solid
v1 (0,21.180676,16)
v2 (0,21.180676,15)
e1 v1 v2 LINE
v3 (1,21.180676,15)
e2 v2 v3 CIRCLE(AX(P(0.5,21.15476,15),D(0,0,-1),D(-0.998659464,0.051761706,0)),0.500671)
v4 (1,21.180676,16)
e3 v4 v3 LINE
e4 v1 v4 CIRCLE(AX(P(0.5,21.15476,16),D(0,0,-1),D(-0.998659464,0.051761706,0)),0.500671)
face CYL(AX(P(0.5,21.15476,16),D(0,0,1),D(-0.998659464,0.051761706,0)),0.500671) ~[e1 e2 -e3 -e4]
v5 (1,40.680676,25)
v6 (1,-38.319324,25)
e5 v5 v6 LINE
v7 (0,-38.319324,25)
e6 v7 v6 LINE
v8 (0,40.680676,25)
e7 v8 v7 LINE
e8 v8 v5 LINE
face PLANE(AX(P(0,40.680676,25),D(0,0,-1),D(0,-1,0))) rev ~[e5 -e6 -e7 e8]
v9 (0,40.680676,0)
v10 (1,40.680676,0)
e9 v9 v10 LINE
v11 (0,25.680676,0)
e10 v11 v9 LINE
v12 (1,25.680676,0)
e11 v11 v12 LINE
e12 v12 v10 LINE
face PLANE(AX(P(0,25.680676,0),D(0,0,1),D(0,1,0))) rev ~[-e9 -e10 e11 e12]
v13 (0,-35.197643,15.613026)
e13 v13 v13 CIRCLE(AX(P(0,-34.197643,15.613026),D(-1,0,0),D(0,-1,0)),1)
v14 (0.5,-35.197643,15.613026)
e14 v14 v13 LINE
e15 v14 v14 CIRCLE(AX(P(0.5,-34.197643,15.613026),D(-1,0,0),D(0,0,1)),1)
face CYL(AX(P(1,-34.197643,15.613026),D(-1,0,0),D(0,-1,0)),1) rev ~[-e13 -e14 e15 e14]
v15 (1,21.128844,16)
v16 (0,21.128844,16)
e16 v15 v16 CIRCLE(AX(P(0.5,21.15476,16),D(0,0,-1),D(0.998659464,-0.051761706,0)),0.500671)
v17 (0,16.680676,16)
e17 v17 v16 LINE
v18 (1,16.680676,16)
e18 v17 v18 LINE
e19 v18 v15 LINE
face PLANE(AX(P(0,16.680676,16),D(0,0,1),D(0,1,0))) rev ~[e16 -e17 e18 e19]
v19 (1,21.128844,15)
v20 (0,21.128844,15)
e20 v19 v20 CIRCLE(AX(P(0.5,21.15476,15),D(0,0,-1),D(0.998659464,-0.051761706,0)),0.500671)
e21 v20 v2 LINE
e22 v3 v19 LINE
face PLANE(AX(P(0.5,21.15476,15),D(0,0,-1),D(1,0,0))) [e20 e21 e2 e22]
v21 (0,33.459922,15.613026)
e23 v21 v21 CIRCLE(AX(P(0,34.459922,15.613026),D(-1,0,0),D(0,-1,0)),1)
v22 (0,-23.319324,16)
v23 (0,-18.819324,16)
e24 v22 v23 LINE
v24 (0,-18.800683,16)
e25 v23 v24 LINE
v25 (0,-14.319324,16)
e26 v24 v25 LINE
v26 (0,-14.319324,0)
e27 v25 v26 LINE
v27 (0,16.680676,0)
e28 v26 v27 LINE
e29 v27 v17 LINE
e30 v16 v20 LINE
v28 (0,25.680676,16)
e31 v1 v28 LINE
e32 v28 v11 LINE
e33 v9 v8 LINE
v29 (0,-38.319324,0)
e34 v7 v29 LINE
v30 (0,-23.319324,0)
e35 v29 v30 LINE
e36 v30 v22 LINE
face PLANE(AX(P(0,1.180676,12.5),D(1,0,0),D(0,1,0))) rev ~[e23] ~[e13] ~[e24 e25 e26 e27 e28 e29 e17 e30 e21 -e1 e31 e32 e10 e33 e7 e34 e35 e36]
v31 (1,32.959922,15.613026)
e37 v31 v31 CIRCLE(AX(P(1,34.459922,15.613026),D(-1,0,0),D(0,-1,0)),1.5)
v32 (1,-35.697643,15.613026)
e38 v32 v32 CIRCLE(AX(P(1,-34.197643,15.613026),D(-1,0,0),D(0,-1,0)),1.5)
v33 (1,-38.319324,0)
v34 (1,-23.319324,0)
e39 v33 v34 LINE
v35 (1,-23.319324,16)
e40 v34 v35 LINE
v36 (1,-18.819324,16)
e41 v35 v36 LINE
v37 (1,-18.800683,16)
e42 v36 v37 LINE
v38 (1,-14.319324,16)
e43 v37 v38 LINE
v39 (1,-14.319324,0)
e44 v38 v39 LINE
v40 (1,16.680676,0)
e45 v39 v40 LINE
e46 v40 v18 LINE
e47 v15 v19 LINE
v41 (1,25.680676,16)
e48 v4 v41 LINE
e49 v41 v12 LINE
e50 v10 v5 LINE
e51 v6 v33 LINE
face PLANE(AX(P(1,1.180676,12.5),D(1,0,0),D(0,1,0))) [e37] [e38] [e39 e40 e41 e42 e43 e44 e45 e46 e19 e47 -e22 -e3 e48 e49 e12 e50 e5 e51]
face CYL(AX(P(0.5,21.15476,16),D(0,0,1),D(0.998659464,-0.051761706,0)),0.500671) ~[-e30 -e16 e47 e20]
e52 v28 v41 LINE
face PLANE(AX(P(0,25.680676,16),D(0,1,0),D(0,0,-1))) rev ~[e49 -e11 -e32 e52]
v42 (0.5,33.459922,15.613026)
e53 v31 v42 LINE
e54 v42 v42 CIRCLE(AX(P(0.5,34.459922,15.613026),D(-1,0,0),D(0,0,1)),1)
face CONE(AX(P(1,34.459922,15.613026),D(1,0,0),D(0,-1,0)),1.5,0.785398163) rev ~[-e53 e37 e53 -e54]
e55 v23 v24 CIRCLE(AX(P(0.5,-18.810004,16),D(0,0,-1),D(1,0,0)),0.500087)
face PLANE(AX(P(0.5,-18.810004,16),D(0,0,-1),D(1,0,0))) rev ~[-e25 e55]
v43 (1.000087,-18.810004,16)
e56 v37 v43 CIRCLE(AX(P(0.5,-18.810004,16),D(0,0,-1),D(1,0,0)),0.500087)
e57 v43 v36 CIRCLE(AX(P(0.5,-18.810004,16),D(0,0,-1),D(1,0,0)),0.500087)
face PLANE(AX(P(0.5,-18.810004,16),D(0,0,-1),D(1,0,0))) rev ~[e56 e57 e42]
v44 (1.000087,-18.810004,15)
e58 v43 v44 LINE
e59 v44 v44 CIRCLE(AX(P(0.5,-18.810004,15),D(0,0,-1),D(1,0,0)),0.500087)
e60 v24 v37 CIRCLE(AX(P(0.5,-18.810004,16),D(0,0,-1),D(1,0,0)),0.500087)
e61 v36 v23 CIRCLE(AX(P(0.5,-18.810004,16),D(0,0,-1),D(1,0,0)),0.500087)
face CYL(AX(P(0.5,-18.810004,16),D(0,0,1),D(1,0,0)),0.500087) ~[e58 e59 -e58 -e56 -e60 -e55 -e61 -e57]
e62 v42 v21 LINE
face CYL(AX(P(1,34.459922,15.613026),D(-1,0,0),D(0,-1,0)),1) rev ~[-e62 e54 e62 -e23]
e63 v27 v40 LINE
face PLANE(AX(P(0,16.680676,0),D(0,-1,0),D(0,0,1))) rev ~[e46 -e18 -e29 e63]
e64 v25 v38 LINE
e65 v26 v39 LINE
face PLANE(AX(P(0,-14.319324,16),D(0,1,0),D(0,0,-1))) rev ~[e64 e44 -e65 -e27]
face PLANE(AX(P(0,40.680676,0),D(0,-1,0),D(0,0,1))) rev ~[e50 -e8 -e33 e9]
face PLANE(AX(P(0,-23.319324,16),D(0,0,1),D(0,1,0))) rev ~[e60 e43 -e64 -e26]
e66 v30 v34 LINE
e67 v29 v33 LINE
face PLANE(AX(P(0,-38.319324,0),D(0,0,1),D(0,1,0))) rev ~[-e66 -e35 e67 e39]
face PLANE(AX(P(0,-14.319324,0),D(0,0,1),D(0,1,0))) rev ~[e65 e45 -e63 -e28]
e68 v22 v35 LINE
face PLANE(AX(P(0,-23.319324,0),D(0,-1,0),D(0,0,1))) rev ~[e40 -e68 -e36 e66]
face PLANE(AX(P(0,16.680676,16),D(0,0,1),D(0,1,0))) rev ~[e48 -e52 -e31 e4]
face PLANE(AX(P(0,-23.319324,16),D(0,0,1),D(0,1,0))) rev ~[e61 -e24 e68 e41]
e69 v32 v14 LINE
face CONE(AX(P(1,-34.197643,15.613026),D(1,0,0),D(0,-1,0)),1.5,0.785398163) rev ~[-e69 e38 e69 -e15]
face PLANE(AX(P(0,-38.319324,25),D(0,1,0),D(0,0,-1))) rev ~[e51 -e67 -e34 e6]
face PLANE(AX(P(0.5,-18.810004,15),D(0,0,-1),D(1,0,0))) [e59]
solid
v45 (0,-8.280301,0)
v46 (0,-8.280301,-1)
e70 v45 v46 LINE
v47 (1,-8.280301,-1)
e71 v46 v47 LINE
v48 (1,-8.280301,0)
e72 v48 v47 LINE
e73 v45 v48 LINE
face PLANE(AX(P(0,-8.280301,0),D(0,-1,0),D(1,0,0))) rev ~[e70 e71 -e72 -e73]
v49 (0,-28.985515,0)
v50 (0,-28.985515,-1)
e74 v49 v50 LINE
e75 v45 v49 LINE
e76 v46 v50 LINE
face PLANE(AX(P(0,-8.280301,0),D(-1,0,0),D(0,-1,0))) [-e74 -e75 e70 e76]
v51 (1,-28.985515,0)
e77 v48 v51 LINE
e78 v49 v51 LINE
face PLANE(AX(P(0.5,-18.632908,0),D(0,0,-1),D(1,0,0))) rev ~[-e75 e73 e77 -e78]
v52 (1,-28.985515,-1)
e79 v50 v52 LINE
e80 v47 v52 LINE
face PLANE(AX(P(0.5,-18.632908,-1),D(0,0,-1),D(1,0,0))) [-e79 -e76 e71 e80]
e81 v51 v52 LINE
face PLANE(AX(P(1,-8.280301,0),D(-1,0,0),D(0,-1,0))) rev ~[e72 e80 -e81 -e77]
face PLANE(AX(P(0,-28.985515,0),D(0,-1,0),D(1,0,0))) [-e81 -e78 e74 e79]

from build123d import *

# Parameters (mm, degrees)
F1_DEPTH       = 1
F3_D           = 2
F3_CSINK_D     = 3
F3_CSINK_ANGLE = 90
F5_DEPTH       = 1
F7_DEPTH       = 1
F8_W           = 1
F8_H           = 20.7052147016
F9_DEPTH       = 1


with BuildPart() as f1:
    # F0 (on Right) → F1 (new body)
    with BuildSketch(Plane.YZ):
        Polygon((40.680675586, 25), (-38.319324414, 25), (-38.319324414, 0), (-23.319324414, 0), (-23.319324414, 16), (-14.319324414, 16), (-14.319324414, 0), (16.680675586, 0), (16.680675586, 16), (25.680675586, 16), (25.680675586, 0), (40.680675586, 0), align=None)
    extrude(amount=F1_DEPTH)

    # F3 (through all)
    with Locations(Plane.YZ.offset(1)):
        with Locations((-34.1976433992, 15.6130259857), (34.4599224627, 15.6130259857)):
            CounterSinkHole(F3_D / 2, F3_CSINK_D / 2, counter_sink_angle=F3_CSINK_ANGLE)

    # F4 (on face) → F5 (join)
    with BuildSketch(Plane(origin=(0, 0, 16), x_dir=(1, 0, 0), z_dir=(0, 0, -1))):
        with BuildLine():
            ThreePointArc((-8.68652e-05, 18.8100038602), (0.5, 18.309916995), (1.0000868652, 18.8100038602))
            ThreePointArc((1.0000868652, 18.8100038602), (0.5, 19.3100907254), (-8.68652e-05, 18.8100038602))
        make_face()
    extrude(amount=F5_DEPTH)

    # F6 (on face) → F7 (join)
    with BuildSketch(Plane(origin=(0, 0, 16), x_dir=(1, 0, 0), z_dir=(0, 0, -1))):
        with BuildLine():
            Line((1, -21.180675586), (1, -21.1288443983))
            ThreePointArc((1, -21.1288443983), (0.5, -20.6540888246), (0, -21.1288443983))
            Line((0, -21.1288443983), (0, -21.180675586))
            ThreePointArc((0, -21.180675586), (0.5, -21.6554311597), (1, -21.180675586))
        make_face()
    extrude(amount=F7_DEPTH)


with BuildPart() as f9:
    # F8 (on face) → F9 (new body)
    with BuildSketch(Plane(origin=(0, 0, 0), x_dir=(1, 0, 0), z_dir=(0, 0, -1))):
        with Locations((0.5, 18.6329078861)):
            Rectangle(F8_W, F8_H)
    extrude(amount=F9_DEPTH)


solid = Compound([f1.part, f9.part])
